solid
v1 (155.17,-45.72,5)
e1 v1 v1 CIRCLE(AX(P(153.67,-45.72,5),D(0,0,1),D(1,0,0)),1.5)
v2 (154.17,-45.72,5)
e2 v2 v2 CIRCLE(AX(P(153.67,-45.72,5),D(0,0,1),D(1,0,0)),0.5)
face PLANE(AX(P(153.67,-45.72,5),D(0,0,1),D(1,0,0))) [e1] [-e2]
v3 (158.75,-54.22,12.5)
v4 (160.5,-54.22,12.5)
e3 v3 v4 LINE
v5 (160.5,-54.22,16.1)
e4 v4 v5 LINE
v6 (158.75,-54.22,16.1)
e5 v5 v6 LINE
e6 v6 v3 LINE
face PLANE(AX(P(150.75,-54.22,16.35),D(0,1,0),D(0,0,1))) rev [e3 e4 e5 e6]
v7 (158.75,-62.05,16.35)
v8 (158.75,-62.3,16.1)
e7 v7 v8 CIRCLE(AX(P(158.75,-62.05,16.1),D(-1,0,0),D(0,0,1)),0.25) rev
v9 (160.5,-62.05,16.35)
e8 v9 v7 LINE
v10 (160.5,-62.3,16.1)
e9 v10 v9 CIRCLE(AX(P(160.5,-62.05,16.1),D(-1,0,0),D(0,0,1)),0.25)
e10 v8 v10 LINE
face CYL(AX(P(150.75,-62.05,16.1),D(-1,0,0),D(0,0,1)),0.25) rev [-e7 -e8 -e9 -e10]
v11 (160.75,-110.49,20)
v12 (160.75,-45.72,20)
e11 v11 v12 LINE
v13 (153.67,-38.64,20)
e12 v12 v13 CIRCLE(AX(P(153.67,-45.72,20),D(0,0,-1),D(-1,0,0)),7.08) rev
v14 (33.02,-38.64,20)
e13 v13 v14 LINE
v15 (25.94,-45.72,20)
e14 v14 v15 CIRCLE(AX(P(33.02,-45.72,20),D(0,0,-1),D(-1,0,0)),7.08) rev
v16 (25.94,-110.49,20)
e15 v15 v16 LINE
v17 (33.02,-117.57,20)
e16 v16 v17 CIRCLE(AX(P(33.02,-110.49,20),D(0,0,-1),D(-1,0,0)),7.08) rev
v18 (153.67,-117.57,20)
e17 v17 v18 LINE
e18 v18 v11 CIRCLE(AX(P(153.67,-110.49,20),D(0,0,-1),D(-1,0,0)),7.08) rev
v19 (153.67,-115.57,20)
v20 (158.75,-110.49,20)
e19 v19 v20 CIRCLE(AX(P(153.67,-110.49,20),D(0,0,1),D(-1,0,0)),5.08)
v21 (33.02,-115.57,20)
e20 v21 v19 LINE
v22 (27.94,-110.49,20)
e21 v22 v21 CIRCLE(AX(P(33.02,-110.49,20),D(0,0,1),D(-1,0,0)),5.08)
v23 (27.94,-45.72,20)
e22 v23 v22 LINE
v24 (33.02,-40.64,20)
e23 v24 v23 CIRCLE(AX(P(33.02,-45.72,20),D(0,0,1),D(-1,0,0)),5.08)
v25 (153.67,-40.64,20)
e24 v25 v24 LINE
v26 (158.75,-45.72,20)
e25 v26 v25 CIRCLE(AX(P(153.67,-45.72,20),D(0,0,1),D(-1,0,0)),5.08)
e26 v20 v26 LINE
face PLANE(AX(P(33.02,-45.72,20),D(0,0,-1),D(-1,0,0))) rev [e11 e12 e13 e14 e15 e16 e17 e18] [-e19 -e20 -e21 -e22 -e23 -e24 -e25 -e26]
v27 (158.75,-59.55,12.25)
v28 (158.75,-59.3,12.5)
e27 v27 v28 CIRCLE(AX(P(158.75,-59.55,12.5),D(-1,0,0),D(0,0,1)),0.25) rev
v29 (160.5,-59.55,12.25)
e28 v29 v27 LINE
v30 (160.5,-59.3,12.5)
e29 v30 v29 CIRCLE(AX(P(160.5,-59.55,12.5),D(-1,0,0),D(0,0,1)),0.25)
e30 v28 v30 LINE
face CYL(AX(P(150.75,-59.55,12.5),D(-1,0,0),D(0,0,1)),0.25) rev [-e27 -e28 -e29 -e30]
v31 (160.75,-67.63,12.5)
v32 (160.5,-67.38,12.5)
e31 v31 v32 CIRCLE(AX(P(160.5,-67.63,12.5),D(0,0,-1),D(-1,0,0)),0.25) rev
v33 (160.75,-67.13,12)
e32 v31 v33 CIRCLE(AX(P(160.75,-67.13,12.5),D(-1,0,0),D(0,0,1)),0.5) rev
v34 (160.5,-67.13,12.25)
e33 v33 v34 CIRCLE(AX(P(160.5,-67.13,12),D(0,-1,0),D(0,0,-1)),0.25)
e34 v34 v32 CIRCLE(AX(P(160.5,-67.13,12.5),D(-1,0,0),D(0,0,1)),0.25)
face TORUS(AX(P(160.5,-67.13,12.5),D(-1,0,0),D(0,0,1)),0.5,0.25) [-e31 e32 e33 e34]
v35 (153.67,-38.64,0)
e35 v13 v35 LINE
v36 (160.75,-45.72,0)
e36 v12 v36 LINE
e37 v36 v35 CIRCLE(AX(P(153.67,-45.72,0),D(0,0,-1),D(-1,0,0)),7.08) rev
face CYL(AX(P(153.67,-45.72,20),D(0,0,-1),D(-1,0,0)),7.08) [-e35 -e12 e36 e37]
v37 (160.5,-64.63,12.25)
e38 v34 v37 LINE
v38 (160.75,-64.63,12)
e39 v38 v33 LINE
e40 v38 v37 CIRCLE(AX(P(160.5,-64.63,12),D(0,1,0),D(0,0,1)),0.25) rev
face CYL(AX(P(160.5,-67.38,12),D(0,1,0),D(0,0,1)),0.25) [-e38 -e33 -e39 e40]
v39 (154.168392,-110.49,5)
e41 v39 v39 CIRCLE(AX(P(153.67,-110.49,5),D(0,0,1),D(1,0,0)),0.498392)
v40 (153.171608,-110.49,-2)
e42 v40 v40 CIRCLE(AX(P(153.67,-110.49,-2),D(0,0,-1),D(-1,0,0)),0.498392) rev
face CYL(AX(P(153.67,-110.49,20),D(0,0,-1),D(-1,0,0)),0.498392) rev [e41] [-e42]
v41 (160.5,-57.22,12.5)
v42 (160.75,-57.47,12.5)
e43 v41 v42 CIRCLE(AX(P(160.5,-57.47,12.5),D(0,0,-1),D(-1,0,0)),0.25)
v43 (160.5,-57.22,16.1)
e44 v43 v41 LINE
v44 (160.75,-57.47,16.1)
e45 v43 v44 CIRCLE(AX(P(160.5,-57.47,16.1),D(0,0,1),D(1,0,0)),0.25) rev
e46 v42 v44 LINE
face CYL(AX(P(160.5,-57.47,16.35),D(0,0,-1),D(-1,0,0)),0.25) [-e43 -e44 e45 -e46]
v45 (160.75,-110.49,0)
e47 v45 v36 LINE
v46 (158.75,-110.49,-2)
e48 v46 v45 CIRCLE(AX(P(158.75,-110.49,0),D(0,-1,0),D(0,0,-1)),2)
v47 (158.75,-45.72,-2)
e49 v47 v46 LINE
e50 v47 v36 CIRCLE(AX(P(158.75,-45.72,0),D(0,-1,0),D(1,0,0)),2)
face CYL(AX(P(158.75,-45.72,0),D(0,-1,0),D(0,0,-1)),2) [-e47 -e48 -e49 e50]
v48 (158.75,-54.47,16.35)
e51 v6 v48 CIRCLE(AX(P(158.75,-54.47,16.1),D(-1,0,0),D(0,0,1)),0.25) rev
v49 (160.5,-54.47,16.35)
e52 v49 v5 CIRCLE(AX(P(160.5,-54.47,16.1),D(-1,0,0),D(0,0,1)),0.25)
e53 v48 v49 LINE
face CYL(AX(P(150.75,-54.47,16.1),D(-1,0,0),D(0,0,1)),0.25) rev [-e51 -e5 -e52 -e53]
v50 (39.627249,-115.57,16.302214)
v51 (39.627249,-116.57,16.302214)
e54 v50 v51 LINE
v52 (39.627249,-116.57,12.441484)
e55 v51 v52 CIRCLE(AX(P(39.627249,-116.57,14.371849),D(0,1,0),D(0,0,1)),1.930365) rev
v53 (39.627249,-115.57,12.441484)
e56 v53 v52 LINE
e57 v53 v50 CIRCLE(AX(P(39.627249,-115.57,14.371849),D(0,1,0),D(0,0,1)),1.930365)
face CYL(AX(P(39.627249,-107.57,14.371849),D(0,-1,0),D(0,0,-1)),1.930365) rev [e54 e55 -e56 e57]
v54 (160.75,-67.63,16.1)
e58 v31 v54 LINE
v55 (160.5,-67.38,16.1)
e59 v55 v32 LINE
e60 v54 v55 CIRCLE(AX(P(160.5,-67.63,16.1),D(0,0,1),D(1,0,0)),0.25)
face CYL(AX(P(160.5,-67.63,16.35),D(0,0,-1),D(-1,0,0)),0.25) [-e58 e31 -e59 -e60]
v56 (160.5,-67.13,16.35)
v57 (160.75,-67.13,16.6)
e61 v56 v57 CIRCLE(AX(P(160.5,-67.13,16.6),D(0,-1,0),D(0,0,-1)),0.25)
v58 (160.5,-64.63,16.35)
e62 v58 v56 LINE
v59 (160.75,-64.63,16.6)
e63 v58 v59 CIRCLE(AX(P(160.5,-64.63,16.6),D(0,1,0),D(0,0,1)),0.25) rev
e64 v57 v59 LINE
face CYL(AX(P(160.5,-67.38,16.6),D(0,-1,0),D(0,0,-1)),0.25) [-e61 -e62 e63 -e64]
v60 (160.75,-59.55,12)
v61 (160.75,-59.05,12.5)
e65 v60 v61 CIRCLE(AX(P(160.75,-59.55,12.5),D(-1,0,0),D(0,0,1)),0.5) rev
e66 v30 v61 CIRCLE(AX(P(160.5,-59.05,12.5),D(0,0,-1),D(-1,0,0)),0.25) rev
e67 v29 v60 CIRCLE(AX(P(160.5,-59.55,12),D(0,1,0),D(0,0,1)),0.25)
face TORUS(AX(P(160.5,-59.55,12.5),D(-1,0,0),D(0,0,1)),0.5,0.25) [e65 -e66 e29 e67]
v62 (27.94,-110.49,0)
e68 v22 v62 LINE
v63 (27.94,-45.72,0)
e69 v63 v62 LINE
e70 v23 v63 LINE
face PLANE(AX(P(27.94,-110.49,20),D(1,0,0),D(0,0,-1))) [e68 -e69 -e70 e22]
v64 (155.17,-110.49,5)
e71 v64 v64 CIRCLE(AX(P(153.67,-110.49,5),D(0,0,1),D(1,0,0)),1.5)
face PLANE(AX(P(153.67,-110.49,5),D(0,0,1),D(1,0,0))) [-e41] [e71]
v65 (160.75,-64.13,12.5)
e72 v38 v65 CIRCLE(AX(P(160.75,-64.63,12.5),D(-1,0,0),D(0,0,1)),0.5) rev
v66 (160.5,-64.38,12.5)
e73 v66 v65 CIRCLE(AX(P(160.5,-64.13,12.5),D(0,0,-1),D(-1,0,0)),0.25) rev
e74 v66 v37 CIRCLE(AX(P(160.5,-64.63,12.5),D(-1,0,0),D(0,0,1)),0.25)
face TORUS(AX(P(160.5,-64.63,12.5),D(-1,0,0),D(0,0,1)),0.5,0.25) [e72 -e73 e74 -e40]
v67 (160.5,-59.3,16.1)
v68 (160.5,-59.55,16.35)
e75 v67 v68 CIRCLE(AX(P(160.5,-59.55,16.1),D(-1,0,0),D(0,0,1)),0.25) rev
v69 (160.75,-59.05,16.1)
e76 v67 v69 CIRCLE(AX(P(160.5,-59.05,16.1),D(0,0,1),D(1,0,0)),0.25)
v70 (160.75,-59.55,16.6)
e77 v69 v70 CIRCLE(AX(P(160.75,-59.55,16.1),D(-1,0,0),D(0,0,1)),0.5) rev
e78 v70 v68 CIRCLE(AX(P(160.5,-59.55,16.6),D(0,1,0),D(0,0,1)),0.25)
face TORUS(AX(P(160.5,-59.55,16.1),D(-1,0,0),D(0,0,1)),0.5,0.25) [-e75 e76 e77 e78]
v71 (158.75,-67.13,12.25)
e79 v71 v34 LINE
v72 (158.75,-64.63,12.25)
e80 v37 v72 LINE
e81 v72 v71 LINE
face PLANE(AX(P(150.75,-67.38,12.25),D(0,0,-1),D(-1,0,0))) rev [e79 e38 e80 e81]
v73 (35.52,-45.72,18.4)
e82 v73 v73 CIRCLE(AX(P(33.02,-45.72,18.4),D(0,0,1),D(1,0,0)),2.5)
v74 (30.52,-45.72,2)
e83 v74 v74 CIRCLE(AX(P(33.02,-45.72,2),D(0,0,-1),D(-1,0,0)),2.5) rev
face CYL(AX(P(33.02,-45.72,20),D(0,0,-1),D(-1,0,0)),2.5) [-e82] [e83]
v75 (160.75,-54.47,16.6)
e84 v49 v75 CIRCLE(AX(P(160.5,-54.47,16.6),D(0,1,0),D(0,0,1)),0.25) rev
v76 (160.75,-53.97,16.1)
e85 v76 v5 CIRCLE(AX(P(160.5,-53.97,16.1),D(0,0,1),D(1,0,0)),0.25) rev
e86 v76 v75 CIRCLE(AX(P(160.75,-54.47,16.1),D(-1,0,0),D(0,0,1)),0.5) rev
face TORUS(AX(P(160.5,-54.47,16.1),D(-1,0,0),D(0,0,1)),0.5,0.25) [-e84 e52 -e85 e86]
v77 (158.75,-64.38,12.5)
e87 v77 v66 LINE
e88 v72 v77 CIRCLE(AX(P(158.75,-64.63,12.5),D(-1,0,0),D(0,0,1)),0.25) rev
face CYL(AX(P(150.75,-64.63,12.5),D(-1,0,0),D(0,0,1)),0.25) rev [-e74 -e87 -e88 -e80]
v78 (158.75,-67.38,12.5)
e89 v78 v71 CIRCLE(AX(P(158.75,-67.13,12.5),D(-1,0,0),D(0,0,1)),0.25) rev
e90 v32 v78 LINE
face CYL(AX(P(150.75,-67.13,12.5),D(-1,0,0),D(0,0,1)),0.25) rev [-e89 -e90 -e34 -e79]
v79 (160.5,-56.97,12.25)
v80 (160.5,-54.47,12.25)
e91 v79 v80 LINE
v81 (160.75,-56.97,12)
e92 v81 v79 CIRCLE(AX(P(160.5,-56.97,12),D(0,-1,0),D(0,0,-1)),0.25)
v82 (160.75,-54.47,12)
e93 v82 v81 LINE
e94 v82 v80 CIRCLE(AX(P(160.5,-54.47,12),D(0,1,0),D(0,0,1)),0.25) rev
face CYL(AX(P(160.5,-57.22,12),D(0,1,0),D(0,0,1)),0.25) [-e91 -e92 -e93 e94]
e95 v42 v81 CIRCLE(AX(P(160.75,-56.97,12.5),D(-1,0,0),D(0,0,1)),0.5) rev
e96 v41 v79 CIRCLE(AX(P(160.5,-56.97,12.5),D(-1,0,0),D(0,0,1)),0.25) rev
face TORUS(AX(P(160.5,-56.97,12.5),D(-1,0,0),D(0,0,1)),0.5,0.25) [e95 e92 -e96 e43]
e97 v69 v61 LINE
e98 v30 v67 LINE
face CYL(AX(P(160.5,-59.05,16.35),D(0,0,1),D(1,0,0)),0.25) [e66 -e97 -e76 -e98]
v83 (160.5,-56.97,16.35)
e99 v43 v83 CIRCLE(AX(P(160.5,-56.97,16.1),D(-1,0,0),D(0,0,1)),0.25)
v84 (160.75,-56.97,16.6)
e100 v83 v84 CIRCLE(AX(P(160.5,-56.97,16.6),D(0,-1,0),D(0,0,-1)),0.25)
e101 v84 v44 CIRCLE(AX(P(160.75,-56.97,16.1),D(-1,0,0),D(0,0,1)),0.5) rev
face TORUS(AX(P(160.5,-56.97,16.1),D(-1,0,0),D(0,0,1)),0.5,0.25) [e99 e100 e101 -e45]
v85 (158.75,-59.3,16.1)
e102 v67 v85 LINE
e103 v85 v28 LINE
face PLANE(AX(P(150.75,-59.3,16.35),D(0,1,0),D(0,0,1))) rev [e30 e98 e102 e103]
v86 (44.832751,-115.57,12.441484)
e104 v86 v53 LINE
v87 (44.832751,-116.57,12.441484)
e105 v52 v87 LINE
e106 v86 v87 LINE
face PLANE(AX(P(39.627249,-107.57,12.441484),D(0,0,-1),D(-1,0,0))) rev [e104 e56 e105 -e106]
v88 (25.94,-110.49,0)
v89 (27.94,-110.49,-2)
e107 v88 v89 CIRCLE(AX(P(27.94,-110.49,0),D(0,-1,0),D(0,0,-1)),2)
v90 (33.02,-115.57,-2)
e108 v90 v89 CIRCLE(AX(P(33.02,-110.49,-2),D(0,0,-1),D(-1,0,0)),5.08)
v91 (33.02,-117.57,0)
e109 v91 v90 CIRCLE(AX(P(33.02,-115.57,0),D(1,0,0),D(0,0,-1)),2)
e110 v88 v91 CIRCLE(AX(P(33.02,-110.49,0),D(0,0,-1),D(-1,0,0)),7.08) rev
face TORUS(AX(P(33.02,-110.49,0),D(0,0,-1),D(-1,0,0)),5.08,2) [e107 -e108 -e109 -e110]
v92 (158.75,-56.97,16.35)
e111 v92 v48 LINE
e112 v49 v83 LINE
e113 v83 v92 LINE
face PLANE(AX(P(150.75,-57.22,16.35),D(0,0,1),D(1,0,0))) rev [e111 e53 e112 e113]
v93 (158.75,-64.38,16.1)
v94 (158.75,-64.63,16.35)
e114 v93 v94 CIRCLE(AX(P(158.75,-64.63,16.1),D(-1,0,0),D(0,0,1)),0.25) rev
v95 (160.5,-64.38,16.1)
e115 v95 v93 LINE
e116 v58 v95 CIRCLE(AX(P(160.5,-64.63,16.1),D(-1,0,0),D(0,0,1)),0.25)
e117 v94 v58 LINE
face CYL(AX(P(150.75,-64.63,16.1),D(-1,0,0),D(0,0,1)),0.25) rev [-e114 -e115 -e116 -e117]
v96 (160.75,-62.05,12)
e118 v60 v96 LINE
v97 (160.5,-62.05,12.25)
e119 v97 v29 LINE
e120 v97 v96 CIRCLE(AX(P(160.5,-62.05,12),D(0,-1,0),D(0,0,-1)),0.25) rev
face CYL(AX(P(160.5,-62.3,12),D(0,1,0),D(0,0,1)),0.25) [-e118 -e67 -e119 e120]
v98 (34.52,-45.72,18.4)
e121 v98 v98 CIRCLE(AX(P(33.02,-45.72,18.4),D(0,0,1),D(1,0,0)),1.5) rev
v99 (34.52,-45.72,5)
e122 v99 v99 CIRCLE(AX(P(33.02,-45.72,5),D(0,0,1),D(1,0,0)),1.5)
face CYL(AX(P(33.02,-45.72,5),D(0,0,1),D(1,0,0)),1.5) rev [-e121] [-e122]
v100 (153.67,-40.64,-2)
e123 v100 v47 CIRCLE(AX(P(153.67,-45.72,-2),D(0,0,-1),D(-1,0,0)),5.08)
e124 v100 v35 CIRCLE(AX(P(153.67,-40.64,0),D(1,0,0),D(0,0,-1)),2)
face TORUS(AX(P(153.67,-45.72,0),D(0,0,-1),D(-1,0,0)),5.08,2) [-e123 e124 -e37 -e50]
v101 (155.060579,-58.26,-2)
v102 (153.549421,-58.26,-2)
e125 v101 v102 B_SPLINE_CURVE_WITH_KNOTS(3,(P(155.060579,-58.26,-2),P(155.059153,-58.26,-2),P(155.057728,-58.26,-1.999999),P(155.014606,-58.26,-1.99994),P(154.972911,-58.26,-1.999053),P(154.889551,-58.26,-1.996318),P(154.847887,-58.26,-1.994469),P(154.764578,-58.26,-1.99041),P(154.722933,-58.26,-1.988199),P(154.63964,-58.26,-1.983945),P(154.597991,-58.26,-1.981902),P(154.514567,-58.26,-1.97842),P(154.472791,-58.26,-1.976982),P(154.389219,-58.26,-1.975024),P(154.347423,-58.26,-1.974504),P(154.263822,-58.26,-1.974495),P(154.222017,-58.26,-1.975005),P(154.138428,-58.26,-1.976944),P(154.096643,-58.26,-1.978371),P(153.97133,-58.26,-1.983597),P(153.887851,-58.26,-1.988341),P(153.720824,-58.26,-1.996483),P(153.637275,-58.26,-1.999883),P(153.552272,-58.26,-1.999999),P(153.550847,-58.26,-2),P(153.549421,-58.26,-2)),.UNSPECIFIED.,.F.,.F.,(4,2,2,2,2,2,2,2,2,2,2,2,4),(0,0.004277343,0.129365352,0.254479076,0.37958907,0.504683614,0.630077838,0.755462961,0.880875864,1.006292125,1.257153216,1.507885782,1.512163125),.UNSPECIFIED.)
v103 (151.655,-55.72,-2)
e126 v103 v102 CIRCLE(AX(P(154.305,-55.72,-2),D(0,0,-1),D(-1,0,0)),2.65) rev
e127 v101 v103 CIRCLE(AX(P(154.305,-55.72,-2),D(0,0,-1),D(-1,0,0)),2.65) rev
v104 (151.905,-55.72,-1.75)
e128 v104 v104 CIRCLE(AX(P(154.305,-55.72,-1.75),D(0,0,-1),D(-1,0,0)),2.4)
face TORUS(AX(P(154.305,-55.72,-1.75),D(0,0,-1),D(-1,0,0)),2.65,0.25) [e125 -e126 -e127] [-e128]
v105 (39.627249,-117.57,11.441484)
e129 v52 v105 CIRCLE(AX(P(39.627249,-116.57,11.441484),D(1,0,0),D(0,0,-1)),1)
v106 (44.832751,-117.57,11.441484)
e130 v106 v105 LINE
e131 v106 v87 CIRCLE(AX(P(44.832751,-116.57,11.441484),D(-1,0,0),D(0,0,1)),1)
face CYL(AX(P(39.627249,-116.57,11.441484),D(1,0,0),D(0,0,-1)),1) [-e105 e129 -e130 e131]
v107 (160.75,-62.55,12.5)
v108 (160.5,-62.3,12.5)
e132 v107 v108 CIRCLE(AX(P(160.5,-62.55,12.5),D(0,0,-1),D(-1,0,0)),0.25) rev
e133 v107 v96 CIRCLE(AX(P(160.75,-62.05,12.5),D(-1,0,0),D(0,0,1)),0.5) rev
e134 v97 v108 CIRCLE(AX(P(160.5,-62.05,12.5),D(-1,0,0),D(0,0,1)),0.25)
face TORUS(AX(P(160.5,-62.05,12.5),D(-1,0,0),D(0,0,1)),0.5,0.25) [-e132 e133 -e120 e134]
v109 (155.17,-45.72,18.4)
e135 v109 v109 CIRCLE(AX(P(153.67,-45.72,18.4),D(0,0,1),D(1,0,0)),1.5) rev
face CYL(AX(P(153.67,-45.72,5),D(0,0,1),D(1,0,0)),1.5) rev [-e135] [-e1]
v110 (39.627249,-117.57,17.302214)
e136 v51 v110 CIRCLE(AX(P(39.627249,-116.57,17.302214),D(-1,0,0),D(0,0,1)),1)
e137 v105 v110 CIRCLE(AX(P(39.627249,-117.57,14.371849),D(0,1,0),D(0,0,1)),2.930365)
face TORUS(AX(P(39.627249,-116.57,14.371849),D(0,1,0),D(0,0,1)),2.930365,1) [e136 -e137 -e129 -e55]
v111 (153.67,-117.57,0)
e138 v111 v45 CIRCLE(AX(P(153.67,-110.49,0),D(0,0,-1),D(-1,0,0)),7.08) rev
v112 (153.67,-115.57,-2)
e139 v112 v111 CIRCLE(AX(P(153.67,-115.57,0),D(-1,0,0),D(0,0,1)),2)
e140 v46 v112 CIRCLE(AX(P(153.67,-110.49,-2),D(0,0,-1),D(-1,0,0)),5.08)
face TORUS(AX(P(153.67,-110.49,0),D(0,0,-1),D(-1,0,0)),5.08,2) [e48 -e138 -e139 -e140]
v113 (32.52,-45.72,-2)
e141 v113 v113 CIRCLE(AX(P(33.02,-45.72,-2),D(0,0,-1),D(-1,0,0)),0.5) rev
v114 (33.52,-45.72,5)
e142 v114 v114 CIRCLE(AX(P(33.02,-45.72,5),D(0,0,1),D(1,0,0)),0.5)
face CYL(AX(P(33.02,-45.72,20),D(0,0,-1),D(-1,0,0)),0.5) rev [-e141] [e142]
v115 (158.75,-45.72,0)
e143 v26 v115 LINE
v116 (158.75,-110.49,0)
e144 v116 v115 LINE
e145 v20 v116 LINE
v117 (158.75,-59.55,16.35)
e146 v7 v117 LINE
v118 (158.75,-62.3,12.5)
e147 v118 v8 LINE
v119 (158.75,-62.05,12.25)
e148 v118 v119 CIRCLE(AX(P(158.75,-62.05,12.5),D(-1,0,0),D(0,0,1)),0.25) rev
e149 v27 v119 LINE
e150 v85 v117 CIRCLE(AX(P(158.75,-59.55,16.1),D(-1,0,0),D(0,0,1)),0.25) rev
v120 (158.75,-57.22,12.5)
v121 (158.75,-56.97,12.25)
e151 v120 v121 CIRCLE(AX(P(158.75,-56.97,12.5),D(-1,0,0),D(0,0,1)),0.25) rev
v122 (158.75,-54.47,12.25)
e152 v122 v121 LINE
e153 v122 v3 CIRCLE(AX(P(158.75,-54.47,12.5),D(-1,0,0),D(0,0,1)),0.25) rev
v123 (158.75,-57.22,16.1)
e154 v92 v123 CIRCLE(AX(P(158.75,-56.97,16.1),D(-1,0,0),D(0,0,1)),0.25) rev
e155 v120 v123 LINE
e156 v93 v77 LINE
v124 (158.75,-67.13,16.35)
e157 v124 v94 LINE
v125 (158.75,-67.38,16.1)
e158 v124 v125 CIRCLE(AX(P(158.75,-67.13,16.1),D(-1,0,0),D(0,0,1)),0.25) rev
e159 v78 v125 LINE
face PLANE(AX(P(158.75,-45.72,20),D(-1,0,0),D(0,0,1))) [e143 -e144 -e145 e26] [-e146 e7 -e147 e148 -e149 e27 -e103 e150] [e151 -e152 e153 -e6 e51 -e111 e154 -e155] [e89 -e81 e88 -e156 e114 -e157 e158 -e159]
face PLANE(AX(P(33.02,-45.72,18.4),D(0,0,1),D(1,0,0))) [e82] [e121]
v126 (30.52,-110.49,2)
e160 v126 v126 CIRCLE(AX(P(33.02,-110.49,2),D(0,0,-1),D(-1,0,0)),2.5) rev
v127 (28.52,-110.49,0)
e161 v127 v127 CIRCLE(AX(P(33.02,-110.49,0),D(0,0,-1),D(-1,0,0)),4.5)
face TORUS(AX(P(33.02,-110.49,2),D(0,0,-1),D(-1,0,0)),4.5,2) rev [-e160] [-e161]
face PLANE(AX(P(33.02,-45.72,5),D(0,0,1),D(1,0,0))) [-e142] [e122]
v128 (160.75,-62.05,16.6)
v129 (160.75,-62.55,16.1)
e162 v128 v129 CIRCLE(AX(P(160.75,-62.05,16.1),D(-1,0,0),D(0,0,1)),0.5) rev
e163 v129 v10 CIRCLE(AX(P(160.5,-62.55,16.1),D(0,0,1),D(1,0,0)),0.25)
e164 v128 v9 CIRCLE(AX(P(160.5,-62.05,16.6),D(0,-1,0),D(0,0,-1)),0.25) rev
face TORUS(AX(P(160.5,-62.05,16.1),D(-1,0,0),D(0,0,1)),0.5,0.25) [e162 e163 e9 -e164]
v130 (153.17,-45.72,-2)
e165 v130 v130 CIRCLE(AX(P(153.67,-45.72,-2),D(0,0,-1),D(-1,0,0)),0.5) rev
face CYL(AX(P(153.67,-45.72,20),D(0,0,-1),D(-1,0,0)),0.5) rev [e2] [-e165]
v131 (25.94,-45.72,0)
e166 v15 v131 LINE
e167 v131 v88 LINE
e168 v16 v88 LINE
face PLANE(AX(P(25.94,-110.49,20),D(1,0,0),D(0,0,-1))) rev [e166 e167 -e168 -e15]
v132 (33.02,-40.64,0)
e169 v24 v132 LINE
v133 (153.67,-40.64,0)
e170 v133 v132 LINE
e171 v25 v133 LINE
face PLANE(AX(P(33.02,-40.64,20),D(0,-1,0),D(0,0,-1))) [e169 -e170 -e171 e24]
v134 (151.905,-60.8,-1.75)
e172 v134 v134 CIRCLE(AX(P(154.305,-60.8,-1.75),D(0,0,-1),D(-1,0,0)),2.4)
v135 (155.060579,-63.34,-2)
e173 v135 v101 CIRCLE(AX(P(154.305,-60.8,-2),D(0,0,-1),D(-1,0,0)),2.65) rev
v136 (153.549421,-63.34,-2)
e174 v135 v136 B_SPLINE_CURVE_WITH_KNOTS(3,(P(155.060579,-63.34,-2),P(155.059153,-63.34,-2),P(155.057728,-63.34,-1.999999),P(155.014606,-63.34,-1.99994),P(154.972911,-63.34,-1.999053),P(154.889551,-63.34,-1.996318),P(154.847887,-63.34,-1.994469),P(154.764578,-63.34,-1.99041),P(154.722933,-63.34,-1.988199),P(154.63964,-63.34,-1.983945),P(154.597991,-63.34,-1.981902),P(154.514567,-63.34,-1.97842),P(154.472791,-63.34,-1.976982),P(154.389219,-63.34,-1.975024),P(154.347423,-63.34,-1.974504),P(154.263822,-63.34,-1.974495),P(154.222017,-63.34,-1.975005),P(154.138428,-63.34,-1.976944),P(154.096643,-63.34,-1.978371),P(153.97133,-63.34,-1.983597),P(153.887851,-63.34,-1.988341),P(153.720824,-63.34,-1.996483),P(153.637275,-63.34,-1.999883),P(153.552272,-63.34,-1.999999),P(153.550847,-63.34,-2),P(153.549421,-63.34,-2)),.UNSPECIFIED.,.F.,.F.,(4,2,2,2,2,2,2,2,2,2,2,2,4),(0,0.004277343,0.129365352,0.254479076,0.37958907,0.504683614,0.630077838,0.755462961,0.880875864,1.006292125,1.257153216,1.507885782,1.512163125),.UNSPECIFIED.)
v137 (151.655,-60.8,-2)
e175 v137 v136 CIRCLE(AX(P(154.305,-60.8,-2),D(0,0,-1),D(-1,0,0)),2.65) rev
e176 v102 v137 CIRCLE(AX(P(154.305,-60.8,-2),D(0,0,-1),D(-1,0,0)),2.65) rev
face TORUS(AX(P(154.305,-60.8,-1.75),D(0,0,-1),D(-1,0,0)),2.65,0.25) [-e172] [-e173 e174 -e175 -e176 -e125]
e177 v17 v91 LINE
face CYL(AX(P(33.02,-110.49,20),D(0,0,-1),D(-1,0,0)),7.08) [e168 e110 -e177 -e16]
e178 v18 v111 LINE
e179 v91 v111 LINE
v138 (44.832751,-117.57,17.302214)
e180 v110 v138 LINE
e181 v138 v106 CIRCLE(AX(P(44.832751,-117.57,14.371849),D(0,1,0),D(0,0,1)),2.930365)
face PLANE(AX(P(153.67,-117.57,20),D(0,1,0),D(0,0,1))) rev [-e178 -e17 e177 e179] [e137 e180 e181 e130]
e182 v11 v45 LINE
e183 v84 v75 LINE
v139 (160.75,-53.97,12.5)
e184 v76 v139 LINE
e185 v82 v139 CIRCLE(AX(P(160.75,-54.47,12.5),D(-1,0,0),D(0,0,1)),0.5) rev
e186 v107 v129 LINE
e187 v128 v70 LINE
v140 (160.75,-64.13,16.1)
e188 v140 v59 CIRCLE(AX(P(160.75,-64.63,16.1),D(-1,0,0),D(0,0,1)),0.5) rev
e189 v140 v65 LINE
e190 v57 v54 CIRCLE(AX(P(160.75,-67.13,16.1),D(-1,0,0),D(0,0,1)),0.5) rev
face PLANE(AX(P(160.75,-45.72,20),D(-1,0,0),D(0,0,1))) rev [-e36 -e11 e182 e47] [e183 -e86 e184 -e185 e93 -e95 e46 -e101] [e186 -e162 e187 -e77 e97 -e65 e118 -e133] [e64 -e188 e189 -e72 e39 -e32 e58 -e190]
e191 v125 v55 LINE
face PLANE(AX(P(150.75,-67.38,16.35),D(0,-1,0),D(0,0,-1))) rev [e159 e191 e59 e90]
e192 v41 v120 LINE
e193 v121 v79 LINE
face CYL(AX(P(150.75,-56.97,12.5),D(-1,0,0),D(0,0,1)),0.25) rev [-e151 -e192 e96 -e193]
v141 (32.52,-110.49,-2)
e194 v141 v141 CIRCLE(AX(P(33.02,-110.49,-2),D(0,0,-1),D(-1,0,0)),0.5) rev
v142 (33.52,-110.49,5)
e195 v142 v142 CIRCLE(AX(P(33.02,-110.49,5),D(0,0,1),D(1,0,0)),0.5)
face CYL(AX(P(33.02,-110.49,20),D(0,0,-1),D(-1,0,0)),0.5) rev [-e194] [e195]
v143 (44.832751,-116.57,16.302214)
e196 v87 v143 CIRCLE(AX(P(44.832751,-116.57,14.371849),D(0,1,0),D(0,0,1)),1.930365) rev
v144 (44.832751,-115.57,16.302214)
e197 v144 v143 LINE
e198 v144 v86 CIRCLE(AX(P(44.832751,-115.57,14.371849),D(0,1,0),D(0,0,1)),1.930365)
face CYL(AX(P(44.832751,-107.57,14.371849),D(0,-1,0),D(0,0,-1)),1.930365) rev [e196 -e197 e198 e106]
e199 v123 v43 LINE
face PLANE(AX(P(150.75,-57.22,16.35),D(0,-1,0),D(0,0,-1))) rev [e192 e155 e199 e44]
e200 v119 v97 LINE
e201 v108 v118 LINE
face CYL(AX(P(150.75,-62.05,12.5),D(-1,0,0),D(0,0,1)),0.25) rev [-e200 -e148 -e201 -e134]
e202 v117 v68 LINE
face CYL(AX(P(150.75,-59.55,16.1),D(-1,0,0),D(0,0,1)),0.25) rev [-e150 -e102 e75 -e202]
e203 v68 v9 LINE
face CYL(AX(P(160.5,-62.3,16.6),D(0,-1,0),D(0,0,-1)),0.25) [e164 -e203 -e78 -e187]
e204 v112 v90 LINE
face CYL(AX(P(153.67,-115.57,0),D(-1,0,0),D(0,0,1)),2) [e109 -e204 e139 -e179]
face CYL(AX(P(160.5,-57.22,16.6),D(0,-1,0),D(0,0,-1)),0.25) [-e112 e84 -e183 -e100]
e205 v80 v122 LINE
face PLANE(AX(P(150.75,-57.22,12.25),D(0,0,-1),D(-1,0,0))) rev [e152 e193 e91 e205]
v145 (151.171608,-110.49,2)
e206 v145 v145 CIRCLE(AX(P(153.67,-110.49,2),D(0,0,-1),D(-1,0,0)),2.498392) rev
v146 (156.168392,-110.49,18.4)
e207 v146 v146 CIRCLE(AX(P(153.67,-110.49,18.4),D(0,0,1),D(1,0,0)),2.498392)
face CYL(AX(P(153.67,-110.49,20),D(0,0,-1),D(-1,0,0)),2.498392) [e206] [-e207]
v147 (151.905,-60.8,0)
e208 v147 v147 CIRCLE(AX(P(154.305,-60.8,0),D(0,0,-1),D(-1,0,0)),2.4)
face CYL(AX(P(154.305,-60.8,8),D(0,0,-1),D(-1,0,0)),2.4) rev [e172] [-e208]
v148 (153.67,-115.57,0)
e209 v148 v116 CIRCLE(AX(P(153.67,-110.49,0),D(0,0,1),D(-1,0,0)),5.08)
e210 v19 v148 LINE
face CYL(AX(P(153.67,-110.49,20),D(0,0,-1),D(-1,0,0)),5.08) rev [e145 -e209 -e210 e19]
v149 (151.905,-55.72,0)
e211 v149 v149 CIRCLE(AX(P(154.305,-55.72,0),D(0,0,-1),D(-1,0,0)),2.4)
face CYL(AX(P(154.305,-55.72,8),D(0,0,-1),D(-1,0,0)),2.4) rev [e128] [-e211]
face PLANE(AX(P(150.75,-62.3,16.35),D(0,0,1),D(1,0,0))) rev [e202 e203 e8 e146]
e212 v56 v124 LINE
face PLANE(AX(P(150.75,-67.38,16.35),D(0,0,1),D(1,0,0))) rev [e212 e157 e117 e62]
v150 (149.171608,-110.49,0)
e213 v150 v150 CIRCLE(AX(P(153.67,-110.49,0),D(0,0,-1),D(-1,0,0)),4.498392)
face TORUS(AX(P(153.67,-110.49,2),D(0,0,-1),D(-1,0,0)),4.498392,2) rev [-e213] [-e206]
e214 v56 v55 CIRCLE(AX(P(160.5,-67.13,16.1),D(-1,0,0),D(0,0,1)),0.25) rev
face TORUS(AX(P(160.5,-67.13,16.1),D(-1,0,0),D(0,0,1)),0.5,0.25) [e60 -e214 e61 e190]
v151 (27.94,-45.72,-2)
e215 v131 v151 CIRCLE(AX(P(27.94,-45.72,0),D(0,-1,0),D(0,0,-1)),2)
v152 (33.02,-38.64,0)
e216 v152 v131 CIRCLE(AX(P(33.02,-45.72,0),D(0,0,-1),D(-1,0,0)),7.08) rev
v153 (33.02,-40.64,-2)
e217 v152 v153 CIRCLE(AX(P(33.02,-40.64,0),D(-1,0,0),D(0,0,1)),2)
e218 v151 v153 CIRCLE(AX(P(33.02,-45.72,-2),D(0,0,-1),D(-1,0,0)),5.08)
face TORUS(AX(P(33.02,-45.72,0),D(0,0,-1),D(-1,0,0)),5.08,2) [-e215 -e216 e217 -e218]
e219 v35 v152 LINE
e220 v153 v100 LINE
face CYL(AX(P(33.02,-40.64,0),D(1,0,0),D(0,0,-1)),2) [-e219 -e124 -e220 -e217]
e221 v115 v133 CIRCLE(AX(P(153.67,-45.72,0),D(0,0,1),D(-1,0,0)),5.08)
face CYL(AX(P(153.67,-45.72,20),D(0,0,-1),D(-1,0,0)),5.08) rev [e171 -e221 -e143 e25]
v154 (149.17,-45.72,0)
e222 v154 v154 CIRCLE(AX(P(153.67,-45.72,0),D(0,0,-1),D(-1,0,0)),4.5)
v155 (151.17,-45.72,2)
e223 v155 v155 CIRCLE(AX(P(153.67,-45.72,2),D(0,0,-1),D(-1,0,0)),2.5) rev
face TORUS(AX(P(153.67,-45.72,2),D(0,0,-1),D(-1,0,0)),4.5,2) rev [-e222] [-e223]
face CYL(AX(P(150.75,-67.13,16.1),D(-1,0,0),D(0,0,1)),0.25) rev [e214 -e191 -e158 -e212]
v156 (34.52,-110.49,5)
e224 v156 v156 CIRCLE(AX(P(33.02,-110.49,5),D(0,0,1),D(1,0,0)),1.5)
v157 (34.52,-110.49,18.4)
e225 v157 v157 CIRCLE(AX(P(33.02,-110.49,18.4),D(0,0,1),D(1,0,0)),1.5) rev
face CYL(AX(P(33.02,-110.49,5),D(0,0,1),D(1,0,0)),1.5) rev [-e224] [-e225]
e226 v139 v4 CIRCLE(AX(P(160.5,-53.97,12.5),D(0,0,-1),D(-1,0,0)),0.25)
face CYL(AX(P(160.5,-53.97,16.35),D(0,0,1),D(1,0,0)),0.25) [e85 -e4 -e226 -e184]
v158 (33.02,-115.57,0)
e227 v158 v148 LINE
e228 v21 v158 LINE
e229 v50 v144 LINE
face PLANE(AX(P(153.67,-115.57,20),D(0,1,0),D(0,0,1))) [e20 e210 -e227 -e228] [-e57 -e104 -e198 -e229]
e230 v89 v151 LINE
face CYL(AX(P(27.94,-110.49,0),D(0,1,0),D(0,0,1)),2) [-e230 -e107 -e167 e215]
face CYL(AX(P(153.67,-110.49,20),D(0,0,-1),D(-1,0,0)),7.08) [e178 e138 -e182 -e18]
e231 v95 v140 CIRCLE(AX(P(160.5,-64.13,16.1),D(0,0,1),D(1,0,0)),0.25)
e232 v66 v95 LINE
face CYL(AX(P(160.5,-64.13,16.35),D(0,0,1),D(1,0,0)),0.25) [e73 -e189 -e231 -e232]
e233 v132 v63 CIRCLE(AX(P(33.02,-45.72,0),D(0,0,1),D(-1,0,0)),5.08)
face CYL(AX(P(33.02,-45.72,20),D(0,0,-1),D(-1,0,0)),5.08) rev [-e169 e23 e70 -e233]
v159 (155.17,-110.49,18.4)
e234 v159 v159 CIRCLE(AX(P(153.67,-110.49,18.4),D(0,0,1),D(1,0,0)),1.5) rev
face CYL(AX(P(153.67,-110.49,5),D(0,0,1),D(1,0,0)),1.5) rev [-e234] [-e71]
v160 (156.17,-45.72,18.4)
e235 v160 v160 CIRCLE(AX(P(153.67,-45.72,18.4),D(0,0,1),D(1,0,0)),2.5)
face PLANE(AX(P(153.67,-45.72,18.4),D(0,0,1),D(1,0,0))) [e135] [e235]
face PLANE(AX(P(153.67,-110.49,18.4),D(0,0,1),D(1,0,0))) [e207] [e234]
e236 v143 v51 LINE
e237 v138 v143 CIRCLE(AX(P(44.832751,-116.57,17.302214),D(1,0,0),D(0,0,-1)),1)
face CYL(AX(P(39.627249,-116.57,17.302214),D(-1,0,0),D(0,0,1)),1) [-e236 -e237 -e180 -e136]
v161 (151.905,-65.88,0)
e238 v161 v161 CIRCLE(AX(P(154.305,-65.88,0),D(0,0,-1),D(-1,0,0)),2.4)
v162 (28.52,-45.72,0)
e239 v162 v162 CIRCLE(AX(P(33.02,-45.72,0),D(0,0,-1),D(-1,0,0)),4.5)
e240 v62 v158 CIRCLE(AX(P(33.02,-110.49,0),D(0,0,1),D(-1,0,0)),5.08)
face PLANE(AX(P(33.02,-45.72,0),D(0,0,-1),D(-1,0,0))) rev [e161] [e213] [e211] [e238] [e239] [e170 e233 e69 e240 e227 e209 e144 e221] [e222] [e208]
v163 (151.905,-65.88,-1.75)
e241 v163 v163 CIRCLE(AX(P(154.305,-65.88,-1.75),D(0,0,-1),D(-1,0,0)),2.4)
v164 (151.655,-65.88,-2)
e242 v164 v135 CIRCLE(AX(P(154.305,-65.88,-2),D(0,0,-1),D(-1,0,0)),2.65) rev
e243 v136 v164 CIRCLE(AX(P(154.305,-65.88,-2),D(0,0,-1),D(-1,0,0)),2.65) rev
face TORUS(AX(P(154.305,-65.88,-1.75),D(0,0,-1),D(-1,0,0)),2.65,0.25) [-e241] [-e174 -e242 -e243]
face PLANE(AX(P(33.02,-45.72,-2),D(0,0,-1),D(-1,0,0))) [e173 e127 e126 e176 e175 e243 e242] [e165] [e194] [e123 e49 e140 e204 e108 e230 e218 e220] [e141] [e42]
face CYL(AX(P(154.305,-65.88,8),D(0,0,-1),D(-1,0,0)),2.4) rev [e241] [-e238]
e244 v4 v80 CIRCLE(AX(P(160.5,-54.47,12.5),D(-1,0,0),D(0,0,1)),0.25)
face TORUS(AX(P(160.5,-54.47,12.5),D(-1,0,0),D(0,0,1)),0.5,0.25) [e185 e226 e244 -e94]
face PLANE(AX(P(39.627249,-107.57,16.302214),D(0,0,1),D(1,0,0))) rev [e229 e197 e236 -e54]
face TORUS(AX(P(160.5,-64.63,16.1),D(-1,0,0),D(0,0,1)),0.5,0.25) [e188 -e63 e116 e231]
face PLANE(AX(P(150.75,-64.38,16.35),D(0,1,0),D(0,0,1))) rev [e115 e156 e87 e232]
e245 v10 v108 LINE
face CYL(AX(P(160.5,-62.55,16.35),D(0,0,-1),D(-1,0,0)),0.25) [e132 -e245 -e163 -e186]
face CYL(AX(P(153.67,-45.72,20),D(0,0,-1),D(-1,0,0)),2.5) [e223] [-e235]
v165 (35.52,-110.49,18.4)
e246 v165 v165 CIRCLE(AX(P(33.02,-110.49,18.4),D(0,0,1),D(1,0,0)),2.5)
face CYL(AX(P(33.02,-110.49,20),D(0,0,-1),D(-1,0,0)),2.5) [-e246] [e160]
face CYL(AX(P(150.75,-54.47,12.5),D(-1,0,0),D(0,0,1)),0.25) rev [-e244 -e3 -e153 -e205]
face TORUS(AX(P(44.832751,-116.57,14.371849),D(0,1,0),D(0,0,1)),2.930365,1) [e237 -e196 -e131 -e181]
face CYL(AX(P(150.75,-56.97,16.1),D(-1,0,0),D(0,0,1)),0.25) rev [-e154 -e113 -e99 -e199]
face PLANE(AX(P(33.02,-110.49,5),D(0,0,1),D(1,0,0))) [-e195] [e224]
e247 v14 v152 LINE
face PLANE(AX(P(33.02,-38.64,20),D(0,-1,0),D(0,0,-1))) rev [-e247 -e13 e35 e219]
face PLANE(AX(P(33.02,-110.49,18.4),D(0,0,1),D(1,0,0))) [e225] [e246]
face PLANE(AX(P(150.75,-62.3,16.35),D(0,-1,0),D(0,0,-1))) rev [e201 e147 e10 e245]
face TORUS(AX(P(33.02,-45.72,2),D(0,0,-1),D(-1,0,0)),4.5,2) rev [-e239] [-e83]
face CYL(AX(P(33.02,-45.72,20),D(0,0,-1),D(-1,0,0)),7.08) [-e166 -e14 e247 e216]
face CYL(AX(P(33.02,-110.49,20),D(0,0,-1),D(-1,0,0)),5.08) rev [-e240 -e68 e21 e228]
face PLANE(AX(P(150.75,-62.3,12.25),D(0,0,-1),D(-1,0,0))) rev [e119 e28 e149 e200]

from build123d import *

# Parameters (mm, degrees)
ESQUISSE1_R             = 2.498391832
ESQUISSE1_R_2           = 2.5
BOSS_EXTRU_1_DEPTH      = 20
COQUE1_T                = 2
CONG_1_R                = 2
ESQUISSE2_R             = 1.5
ENL_V_MAT_EXTRU_1_DEPTH = 15
CONG_2_R                = 2
ESQUISSE6_R             = 2.498391832
ESQUISSE6_R_2           = 2.5
ENL_V_MAT_EXTRU_2_DEPTH = 15
ENL_V_MAT_EXTRU_3_DEPTH = 10
CONG_3_R                = 1
ESQUISSE9_W             = 4.1
ESQUISSE9_H             = 3
ENL_V_MAT_EXTRU_4_DEPTH = 10
CONG_4_R                = 0.25
ESQUISSE10_R            = 2.4
ENL_V_MAT_EXTRU_5_DEPTH = 10
CONG_5_R                = 0.25


with BuildPart() as part:
    # Esquisse1 → Boss.-Extru.1 (new body)
    with BuildSketch(Plane.XY):
        with BuildLine():
            Line((33.02, -40.64), (153.67, -40.64))
            ThreePointArc((153.67, -40.64), (157.262102448, -42.127897552), (158.75, -45.72))
            Line((158.75, -45.72), (158.75, -110.49))
            ThreePointArc((158.75, -110.49), (157.262102448, -114.082102448), (153.67, -115.57))
            Line((153.67, -115.57), (33.02, -115.57))
            ThreePointArc((33.02, -115.57), (29.427897552, -114.082102448), (27.94, -110.49))
            Line((27.94, -110.49), (27.94, -45.72))
            ThreePointArc((27.94, -45.72), (29.427897552, -42.127897552), (33.02, -40.64))
        make_face()
        with Locations((153.67, -110.49)):
            Circle(ESQUISSE1_R, mode=Mode.SUBTRACT)
        with Locations((33.02, -110.49)):
            Circle(ESQUISSE1_R_2, mode=Mode.SUBTRACT)
        with Locations((153.67, -45.72)):
            Circle(ESQUISSE1_R_2, mode=Mode.SUBTRACT)
        with Locations((33.02, -45.72)):
            Circle(ESQUISSE1_R_2, mode=Mode.SUBTRACT)
    extrude(amount=BOSS_EXTRU_1_DEPTH)

    # Coque1
    coque1_openings = [part.faces().sort_by_distance(p)[0] for p in [
        (93.345157035, -78.105084303, 20),
    ]]
    offset(amount=COQUE1_T, openings=coque1_openings, kind=Kind.INTERSECTION)

    # Congé1
    # the kernel refuses this fillet: 2 mm, written as the material it takes off along each edge
    with BuildSketch(Plane(origin=(33.02, -117.57, -2), x_dir=(0, 0, 1), z_dir=(1, 0, 0)), Plane(origin=(153.67, -38.64, -2), x_dir=(0, 0, 1), z_dir=(-1, 0, 0))) as cong_1_piece_1:
        with BuildLine():
            CenterArc((CONG_1_R, -CONG_1_R), CONG_1_R, 90, 90)
            Line((0, -CONG_1_R), (0, 0))
            Line((0, 0), (CONG_1_R, 0))
        make_face()
    extrude(amount=120.65, mode=Mode.SUBTRACT)
    with BuildSketch(Plane(origin=(33.02, -110.49, -2), x_dir=(0, -1, 0), z_dir=(1, 0, 0))) as cong_1_piece_2:
        with BuildLine():
            CenterArc((7.08 - CONG_1_R, -CONG_1_R), CONG_1_R, 0, 90)
            Line((7.08 - CONG_1_R, 0), (7.08, 0))
            Line((7.08, 0), (7.08, -CONG_1_R))
        make_face()
    revolve(axis=Axis((33.02, -110.49, -2), (0, 0, -1)), revolution_arc=90, mode=Mode.SUBTRACT)
    with BuildSketch(Plane(origin=(25.94, -45.72, -2), x_dir=(0, 0, 1), z_dir=(0, -1, 0)), Plane(origin=(160.75, -110.49, -2), x_dir=(0, 0, 1), z_dir=(0, 1, 0))) as cong_1_piece_3:
        with BuildLine():
            CenterArc((CONG_1_R, -CONG_1_R), CONG_1_R, 90, 90)
            Line((0, -CONG_1_R), (0, 0))
            Line((0, 0), (CONG_1_R, 0))
        make_face()
    extrude(amount=64.77, mode=Mode.SUBTRACT)
    with BuildSketch(Plane(origin=(33.02, -45.72, -2), x_dir=(-1, 0, 0), z_dir=(0, -1, 0))) as cong_1_piece_4:
        with BuildLine():
            CenterArc((7.08 - CONG_1_R, -CONG_1_R), CONG_1_R, 0, 90)
            Line((7.08 - CONG_1_R, 0), (7.08, 0))
            Line((7.08, 0), (7.08, -CONG_1_R))
        make_face()
    revolve(axis=Axis((33.02, -45.72, -2), (0, 0, -1)), revolution_arc=90, mode=Mode.SUBTRACT)
    with BuildSketch(Plane(origin=(153.67, -45.72, -2), x_dir=(0, 1, 0), z_dir=(-1, 0, 0))) as cong_1_piece_5:
        with BuildLine():
            CenterArc((7.08 - CONG_1_R, -CONG_1_R), CONG_1_R, 0, 90)
            Line((7.08 - CONG_1_R, 0), (7.08, 0))
            Line((7.08, 0), (7.08, -CONG_1_R))
        make_face()
    revolve(axis=Axis((153.67, -45.72, -2), (0, 0, -1)), revolution_arc=90, mode=Mode.SUBTRACT)
    with BuildSketch(Plane(origin=(153.67, -110.49, -2), x_dir=(1, 0, 0), z_dir=(0, 1, 0))) as cong_1_piece_6:
        with BuildLine():
            CenterArc((7.08 - CONG_1_R, -CONG_1_R), CONG_1_R, 0, 90)
            Line((7.08 - CONG_1_R, 0), (7.08, 0))
            Line((7.08, 0), (7.08, -CONG_1_R))
        make_face()
    revolve(axis=Axis((153.67, -110.49, -2), (0, 0, -1)), revolution_arc=90, mode=Mode.SUBTRACT)

    # Esquisse2 → Enlèv. mat.-Extru.1 (cut)
    with BuildSketch(Plane.XY.offset(20)):
        with Locations((153.67, -110.49)):
            Circle(ESQUISSE2_R)
        with Locations((33.02, -110.49)):
            Circle(ESQUISSE2_R)
        with Locations((33.02, -45.72)):
            Circle(ESQUISSE2_R)
        with Locations((153.67, -45.72)):
            Circle(ESQUISSE2_R)
    extrude(amount=-ENL_V_MAT_EXTRU_1_DEPTH, mode=Mode.SUBTRACT)

    # Congé2
    cong_2_edges = [part.edges().sort_by_distance(p)[0] for p in [
        (151.17, -45.72, 0),
        (151.171608168, -110.49, 0),
        (30.52, -110.49, 0),
        (30.52, -45.72, 0),
    ]]
    fillet(cong_2_edges, radius=CONG_2_R)

    # Esquisse6 → Enlèv. mat.-Extru.2 (cut)
    with BuildSketch(Plane.XY.offset(18.4)):
        with Locations(Location((153.67, -110.49, 0), (0, 0, 180))):
            Circle(ESQUISSE6_R)
        with Locations(Location((33.02, -110.49, 0), (0, 0, 180))):
            Circle(ESQUISSE6_R_2)
        with Locations(Location((33.02, -45.72, 0), (0, 0, 180))):
            Circle(ESQUISSE6_R_2)
        with Locations(Location((153.67, -45.72, 0), (0, 0, 180))):
            Circle(ESQUISSE6_R_2)
    extrude(amount=ENL_V_MAT_EXTRU_2_DEPTH, mode=Mode.SUBTRACT)

    # Esquisse7 → Enlèv. mat.-Extru.3 (cut)
    with BuildSketch(Plane.XZ.offset(117.57)):
        with BuildLine():
            Line((39.627249329, 16.302213906), (44.832750671, 16.302213906))
            ThreePointArc((44.832750671, 16.302213906), (46.763115827, 14.371848749), (44.832750671, 12.441483593))
            Line((44.832750671, 12.441483593), (39.627249329, 12.441483593))
            ThreePointArc((39.627249329, 12.441483593), (37.696884173, 14.371848749), (39.627249329, 16.302213906))
        make_face()
    extrude(amount=-ENL_V_MAT_EXTRU_3_DEPTH, mode=Mode.SUBTRACT)

    # Congé3
    cong_3_edges = [part.edges().sort_by_distance(p)[0] for p in [
        (37.696884173, -117.57, 14.371848749),
        (42.23, -117.57, 12.441483593),
        (46.763115827, -117.57, 14.371848749),
        (42.23, -117.57, 16.302213906),
    ]]
    fillet(cong_3_edges, radius=CONG_3_R)

    # Esquisse9 → Enlèv. mat.-Extru.4 (cut)
    with BuildSketch(Plane(origin=(160.75, 0, 0), x_dir=(0, 0, -1), z_dir=(1, 0, 0))):
        with Locations((-14.3, -65.88)):
            Rectangle(ESQUISSE9_W, ESQUISSE9_H)
        with Locations((-14.3, -60.8)):
            Rectangle(ESQUISSE9_W, ESQUISSE9_H)
        with Locations((-14.3, -55.72)):
            Rectangle(ESQUISSE9_W, ESQUISSE9_H)
    extrude(amount=-ENL_V_MAT_EXTRU_4_DEPTH, mode=Mode.SUBTRACT)

    # Congé4
    cong_4_edges = [part.edges().sort_by_distance(p)[0] for p in [
        (159.75, -67.38, 16.35),
        (159.75, -64.38, 16.35),
        (159.75, -64.38, 12.25),
        (159.75, -67.38, 12.25),
        (160.75, -65.88, 16.35),
        (160.75, -67.38, 14.3),
        (160.75, -65.88, 12.25),
        (160.75, -64.38, 14.3),
        (159.75, -62.3, 16.35),
        (159.75, -59.3, 16.35),
        (159.75, -59.3, 12.25),
        (159.75, -62.3, 12.25),
        (160.75, -60.8, 16.35),
        (160.75, -62.3, 14.3),
        (160.75, -60.8, 12.25),
        (160.75, -59.3, 14.3),
        (159.75, -57.22, 16.35),
        (159.75, -54.22, 16.35),
        (159.75, -54.22, 12.25),
        (159.75, -57.22, 12.25),
        (160.75, -55.72, 16.35),
        (160.75, -57.22, 14.3),
        (160.75, -55.72, 12.25),
        (160.75, -54.22, 14.3),
    ]]
    fillet(cong_4_edges, radius=CONG_4_R)

    # Esquisse10 → Enlèv. mat.-Extru.5 (cut)
    with BuildSketch(Plane(origin=(0, 0, -2), x_dir=(-1, 0, 0), z_dir=(0, 0, -1))):
        with Locations((-154.305, -65.88)):
            Circle(ESQUISSE10_R)
        with Locations((-154.305, -60.8)):
            Circle(ESQUISSE10_R)
        with Locations((-154.305, -55.72)):
            Circle(ESQUISSE10_R)
    extrude(amount=-ENL_V_MAT_EXTRU_5_DEPTH, mode=Mode.SUBTRACT)

    # Congé5
    # the kernel refuses this fillet: 0.25 mm, written as the material it takes off along each edge
    with BuildSketch(Plane(origin=(154.305, -65.88, -2), x_dir=(-1, 0, 0), z_dir=(0, -1, 0))) as cong_5_piece_1:
        with BuildLine():
            CenterArc((2.4 + CONG_5_R, -CONG_5_R), CONG_5_R, 90, 90)
            Line((2.4 + CONG_5_R, 0), (2.4, 0))
            Line((2.4, 0), (2.4, -CONG_5_R))
        make_face()
    revolve(axis=Axis((154.305, -65.88, -2), (0, 0, -1)), mode=Mode.SUBTRACT)
    with BuildSketch(Plane(origin=(154.305, -60.8, -2), x_dir=(-1, 0, 0), z_dir=(0, -1, 0))) as cong_5_piece_2:
        with BuildLine():
            CenterArc((2.4 + CONG_5_R, -CONG_5_R), CONG_5_R, 90, 90)
            Line((2.4 + CONG_5_R, 0), (2.4, 0))
            Line((2.4, 0), (2.4, -CONG_5_R))
        make_face()
    revolve(axis=Axis((154.305, -60.8, -2), (0, 0, -1)), mode=Mode.SUBTRACT)
    with BuildSketch(Plane(origin=(154.305, -55.72, -2), x_dir=(-1, 0, 0), z_dir=(0, -1, 0))) as cong_5_piece_3:
        with BuildLine():
            CenterArc((2.4 + CONG_5_R, -CONG_5_R), CONG_5_R, 90, 90)
            Line((2.4 + CONG_5_R, 0), (2.4, 0))
            Line((2.4, 0), (2.4, -CONG_5_R))
        make_face()
    revolve(axis=Axis((154.305, -55.72, -2), (0, 0, -1)), mode=Mode.SUBTRACT)


solid = part.part
